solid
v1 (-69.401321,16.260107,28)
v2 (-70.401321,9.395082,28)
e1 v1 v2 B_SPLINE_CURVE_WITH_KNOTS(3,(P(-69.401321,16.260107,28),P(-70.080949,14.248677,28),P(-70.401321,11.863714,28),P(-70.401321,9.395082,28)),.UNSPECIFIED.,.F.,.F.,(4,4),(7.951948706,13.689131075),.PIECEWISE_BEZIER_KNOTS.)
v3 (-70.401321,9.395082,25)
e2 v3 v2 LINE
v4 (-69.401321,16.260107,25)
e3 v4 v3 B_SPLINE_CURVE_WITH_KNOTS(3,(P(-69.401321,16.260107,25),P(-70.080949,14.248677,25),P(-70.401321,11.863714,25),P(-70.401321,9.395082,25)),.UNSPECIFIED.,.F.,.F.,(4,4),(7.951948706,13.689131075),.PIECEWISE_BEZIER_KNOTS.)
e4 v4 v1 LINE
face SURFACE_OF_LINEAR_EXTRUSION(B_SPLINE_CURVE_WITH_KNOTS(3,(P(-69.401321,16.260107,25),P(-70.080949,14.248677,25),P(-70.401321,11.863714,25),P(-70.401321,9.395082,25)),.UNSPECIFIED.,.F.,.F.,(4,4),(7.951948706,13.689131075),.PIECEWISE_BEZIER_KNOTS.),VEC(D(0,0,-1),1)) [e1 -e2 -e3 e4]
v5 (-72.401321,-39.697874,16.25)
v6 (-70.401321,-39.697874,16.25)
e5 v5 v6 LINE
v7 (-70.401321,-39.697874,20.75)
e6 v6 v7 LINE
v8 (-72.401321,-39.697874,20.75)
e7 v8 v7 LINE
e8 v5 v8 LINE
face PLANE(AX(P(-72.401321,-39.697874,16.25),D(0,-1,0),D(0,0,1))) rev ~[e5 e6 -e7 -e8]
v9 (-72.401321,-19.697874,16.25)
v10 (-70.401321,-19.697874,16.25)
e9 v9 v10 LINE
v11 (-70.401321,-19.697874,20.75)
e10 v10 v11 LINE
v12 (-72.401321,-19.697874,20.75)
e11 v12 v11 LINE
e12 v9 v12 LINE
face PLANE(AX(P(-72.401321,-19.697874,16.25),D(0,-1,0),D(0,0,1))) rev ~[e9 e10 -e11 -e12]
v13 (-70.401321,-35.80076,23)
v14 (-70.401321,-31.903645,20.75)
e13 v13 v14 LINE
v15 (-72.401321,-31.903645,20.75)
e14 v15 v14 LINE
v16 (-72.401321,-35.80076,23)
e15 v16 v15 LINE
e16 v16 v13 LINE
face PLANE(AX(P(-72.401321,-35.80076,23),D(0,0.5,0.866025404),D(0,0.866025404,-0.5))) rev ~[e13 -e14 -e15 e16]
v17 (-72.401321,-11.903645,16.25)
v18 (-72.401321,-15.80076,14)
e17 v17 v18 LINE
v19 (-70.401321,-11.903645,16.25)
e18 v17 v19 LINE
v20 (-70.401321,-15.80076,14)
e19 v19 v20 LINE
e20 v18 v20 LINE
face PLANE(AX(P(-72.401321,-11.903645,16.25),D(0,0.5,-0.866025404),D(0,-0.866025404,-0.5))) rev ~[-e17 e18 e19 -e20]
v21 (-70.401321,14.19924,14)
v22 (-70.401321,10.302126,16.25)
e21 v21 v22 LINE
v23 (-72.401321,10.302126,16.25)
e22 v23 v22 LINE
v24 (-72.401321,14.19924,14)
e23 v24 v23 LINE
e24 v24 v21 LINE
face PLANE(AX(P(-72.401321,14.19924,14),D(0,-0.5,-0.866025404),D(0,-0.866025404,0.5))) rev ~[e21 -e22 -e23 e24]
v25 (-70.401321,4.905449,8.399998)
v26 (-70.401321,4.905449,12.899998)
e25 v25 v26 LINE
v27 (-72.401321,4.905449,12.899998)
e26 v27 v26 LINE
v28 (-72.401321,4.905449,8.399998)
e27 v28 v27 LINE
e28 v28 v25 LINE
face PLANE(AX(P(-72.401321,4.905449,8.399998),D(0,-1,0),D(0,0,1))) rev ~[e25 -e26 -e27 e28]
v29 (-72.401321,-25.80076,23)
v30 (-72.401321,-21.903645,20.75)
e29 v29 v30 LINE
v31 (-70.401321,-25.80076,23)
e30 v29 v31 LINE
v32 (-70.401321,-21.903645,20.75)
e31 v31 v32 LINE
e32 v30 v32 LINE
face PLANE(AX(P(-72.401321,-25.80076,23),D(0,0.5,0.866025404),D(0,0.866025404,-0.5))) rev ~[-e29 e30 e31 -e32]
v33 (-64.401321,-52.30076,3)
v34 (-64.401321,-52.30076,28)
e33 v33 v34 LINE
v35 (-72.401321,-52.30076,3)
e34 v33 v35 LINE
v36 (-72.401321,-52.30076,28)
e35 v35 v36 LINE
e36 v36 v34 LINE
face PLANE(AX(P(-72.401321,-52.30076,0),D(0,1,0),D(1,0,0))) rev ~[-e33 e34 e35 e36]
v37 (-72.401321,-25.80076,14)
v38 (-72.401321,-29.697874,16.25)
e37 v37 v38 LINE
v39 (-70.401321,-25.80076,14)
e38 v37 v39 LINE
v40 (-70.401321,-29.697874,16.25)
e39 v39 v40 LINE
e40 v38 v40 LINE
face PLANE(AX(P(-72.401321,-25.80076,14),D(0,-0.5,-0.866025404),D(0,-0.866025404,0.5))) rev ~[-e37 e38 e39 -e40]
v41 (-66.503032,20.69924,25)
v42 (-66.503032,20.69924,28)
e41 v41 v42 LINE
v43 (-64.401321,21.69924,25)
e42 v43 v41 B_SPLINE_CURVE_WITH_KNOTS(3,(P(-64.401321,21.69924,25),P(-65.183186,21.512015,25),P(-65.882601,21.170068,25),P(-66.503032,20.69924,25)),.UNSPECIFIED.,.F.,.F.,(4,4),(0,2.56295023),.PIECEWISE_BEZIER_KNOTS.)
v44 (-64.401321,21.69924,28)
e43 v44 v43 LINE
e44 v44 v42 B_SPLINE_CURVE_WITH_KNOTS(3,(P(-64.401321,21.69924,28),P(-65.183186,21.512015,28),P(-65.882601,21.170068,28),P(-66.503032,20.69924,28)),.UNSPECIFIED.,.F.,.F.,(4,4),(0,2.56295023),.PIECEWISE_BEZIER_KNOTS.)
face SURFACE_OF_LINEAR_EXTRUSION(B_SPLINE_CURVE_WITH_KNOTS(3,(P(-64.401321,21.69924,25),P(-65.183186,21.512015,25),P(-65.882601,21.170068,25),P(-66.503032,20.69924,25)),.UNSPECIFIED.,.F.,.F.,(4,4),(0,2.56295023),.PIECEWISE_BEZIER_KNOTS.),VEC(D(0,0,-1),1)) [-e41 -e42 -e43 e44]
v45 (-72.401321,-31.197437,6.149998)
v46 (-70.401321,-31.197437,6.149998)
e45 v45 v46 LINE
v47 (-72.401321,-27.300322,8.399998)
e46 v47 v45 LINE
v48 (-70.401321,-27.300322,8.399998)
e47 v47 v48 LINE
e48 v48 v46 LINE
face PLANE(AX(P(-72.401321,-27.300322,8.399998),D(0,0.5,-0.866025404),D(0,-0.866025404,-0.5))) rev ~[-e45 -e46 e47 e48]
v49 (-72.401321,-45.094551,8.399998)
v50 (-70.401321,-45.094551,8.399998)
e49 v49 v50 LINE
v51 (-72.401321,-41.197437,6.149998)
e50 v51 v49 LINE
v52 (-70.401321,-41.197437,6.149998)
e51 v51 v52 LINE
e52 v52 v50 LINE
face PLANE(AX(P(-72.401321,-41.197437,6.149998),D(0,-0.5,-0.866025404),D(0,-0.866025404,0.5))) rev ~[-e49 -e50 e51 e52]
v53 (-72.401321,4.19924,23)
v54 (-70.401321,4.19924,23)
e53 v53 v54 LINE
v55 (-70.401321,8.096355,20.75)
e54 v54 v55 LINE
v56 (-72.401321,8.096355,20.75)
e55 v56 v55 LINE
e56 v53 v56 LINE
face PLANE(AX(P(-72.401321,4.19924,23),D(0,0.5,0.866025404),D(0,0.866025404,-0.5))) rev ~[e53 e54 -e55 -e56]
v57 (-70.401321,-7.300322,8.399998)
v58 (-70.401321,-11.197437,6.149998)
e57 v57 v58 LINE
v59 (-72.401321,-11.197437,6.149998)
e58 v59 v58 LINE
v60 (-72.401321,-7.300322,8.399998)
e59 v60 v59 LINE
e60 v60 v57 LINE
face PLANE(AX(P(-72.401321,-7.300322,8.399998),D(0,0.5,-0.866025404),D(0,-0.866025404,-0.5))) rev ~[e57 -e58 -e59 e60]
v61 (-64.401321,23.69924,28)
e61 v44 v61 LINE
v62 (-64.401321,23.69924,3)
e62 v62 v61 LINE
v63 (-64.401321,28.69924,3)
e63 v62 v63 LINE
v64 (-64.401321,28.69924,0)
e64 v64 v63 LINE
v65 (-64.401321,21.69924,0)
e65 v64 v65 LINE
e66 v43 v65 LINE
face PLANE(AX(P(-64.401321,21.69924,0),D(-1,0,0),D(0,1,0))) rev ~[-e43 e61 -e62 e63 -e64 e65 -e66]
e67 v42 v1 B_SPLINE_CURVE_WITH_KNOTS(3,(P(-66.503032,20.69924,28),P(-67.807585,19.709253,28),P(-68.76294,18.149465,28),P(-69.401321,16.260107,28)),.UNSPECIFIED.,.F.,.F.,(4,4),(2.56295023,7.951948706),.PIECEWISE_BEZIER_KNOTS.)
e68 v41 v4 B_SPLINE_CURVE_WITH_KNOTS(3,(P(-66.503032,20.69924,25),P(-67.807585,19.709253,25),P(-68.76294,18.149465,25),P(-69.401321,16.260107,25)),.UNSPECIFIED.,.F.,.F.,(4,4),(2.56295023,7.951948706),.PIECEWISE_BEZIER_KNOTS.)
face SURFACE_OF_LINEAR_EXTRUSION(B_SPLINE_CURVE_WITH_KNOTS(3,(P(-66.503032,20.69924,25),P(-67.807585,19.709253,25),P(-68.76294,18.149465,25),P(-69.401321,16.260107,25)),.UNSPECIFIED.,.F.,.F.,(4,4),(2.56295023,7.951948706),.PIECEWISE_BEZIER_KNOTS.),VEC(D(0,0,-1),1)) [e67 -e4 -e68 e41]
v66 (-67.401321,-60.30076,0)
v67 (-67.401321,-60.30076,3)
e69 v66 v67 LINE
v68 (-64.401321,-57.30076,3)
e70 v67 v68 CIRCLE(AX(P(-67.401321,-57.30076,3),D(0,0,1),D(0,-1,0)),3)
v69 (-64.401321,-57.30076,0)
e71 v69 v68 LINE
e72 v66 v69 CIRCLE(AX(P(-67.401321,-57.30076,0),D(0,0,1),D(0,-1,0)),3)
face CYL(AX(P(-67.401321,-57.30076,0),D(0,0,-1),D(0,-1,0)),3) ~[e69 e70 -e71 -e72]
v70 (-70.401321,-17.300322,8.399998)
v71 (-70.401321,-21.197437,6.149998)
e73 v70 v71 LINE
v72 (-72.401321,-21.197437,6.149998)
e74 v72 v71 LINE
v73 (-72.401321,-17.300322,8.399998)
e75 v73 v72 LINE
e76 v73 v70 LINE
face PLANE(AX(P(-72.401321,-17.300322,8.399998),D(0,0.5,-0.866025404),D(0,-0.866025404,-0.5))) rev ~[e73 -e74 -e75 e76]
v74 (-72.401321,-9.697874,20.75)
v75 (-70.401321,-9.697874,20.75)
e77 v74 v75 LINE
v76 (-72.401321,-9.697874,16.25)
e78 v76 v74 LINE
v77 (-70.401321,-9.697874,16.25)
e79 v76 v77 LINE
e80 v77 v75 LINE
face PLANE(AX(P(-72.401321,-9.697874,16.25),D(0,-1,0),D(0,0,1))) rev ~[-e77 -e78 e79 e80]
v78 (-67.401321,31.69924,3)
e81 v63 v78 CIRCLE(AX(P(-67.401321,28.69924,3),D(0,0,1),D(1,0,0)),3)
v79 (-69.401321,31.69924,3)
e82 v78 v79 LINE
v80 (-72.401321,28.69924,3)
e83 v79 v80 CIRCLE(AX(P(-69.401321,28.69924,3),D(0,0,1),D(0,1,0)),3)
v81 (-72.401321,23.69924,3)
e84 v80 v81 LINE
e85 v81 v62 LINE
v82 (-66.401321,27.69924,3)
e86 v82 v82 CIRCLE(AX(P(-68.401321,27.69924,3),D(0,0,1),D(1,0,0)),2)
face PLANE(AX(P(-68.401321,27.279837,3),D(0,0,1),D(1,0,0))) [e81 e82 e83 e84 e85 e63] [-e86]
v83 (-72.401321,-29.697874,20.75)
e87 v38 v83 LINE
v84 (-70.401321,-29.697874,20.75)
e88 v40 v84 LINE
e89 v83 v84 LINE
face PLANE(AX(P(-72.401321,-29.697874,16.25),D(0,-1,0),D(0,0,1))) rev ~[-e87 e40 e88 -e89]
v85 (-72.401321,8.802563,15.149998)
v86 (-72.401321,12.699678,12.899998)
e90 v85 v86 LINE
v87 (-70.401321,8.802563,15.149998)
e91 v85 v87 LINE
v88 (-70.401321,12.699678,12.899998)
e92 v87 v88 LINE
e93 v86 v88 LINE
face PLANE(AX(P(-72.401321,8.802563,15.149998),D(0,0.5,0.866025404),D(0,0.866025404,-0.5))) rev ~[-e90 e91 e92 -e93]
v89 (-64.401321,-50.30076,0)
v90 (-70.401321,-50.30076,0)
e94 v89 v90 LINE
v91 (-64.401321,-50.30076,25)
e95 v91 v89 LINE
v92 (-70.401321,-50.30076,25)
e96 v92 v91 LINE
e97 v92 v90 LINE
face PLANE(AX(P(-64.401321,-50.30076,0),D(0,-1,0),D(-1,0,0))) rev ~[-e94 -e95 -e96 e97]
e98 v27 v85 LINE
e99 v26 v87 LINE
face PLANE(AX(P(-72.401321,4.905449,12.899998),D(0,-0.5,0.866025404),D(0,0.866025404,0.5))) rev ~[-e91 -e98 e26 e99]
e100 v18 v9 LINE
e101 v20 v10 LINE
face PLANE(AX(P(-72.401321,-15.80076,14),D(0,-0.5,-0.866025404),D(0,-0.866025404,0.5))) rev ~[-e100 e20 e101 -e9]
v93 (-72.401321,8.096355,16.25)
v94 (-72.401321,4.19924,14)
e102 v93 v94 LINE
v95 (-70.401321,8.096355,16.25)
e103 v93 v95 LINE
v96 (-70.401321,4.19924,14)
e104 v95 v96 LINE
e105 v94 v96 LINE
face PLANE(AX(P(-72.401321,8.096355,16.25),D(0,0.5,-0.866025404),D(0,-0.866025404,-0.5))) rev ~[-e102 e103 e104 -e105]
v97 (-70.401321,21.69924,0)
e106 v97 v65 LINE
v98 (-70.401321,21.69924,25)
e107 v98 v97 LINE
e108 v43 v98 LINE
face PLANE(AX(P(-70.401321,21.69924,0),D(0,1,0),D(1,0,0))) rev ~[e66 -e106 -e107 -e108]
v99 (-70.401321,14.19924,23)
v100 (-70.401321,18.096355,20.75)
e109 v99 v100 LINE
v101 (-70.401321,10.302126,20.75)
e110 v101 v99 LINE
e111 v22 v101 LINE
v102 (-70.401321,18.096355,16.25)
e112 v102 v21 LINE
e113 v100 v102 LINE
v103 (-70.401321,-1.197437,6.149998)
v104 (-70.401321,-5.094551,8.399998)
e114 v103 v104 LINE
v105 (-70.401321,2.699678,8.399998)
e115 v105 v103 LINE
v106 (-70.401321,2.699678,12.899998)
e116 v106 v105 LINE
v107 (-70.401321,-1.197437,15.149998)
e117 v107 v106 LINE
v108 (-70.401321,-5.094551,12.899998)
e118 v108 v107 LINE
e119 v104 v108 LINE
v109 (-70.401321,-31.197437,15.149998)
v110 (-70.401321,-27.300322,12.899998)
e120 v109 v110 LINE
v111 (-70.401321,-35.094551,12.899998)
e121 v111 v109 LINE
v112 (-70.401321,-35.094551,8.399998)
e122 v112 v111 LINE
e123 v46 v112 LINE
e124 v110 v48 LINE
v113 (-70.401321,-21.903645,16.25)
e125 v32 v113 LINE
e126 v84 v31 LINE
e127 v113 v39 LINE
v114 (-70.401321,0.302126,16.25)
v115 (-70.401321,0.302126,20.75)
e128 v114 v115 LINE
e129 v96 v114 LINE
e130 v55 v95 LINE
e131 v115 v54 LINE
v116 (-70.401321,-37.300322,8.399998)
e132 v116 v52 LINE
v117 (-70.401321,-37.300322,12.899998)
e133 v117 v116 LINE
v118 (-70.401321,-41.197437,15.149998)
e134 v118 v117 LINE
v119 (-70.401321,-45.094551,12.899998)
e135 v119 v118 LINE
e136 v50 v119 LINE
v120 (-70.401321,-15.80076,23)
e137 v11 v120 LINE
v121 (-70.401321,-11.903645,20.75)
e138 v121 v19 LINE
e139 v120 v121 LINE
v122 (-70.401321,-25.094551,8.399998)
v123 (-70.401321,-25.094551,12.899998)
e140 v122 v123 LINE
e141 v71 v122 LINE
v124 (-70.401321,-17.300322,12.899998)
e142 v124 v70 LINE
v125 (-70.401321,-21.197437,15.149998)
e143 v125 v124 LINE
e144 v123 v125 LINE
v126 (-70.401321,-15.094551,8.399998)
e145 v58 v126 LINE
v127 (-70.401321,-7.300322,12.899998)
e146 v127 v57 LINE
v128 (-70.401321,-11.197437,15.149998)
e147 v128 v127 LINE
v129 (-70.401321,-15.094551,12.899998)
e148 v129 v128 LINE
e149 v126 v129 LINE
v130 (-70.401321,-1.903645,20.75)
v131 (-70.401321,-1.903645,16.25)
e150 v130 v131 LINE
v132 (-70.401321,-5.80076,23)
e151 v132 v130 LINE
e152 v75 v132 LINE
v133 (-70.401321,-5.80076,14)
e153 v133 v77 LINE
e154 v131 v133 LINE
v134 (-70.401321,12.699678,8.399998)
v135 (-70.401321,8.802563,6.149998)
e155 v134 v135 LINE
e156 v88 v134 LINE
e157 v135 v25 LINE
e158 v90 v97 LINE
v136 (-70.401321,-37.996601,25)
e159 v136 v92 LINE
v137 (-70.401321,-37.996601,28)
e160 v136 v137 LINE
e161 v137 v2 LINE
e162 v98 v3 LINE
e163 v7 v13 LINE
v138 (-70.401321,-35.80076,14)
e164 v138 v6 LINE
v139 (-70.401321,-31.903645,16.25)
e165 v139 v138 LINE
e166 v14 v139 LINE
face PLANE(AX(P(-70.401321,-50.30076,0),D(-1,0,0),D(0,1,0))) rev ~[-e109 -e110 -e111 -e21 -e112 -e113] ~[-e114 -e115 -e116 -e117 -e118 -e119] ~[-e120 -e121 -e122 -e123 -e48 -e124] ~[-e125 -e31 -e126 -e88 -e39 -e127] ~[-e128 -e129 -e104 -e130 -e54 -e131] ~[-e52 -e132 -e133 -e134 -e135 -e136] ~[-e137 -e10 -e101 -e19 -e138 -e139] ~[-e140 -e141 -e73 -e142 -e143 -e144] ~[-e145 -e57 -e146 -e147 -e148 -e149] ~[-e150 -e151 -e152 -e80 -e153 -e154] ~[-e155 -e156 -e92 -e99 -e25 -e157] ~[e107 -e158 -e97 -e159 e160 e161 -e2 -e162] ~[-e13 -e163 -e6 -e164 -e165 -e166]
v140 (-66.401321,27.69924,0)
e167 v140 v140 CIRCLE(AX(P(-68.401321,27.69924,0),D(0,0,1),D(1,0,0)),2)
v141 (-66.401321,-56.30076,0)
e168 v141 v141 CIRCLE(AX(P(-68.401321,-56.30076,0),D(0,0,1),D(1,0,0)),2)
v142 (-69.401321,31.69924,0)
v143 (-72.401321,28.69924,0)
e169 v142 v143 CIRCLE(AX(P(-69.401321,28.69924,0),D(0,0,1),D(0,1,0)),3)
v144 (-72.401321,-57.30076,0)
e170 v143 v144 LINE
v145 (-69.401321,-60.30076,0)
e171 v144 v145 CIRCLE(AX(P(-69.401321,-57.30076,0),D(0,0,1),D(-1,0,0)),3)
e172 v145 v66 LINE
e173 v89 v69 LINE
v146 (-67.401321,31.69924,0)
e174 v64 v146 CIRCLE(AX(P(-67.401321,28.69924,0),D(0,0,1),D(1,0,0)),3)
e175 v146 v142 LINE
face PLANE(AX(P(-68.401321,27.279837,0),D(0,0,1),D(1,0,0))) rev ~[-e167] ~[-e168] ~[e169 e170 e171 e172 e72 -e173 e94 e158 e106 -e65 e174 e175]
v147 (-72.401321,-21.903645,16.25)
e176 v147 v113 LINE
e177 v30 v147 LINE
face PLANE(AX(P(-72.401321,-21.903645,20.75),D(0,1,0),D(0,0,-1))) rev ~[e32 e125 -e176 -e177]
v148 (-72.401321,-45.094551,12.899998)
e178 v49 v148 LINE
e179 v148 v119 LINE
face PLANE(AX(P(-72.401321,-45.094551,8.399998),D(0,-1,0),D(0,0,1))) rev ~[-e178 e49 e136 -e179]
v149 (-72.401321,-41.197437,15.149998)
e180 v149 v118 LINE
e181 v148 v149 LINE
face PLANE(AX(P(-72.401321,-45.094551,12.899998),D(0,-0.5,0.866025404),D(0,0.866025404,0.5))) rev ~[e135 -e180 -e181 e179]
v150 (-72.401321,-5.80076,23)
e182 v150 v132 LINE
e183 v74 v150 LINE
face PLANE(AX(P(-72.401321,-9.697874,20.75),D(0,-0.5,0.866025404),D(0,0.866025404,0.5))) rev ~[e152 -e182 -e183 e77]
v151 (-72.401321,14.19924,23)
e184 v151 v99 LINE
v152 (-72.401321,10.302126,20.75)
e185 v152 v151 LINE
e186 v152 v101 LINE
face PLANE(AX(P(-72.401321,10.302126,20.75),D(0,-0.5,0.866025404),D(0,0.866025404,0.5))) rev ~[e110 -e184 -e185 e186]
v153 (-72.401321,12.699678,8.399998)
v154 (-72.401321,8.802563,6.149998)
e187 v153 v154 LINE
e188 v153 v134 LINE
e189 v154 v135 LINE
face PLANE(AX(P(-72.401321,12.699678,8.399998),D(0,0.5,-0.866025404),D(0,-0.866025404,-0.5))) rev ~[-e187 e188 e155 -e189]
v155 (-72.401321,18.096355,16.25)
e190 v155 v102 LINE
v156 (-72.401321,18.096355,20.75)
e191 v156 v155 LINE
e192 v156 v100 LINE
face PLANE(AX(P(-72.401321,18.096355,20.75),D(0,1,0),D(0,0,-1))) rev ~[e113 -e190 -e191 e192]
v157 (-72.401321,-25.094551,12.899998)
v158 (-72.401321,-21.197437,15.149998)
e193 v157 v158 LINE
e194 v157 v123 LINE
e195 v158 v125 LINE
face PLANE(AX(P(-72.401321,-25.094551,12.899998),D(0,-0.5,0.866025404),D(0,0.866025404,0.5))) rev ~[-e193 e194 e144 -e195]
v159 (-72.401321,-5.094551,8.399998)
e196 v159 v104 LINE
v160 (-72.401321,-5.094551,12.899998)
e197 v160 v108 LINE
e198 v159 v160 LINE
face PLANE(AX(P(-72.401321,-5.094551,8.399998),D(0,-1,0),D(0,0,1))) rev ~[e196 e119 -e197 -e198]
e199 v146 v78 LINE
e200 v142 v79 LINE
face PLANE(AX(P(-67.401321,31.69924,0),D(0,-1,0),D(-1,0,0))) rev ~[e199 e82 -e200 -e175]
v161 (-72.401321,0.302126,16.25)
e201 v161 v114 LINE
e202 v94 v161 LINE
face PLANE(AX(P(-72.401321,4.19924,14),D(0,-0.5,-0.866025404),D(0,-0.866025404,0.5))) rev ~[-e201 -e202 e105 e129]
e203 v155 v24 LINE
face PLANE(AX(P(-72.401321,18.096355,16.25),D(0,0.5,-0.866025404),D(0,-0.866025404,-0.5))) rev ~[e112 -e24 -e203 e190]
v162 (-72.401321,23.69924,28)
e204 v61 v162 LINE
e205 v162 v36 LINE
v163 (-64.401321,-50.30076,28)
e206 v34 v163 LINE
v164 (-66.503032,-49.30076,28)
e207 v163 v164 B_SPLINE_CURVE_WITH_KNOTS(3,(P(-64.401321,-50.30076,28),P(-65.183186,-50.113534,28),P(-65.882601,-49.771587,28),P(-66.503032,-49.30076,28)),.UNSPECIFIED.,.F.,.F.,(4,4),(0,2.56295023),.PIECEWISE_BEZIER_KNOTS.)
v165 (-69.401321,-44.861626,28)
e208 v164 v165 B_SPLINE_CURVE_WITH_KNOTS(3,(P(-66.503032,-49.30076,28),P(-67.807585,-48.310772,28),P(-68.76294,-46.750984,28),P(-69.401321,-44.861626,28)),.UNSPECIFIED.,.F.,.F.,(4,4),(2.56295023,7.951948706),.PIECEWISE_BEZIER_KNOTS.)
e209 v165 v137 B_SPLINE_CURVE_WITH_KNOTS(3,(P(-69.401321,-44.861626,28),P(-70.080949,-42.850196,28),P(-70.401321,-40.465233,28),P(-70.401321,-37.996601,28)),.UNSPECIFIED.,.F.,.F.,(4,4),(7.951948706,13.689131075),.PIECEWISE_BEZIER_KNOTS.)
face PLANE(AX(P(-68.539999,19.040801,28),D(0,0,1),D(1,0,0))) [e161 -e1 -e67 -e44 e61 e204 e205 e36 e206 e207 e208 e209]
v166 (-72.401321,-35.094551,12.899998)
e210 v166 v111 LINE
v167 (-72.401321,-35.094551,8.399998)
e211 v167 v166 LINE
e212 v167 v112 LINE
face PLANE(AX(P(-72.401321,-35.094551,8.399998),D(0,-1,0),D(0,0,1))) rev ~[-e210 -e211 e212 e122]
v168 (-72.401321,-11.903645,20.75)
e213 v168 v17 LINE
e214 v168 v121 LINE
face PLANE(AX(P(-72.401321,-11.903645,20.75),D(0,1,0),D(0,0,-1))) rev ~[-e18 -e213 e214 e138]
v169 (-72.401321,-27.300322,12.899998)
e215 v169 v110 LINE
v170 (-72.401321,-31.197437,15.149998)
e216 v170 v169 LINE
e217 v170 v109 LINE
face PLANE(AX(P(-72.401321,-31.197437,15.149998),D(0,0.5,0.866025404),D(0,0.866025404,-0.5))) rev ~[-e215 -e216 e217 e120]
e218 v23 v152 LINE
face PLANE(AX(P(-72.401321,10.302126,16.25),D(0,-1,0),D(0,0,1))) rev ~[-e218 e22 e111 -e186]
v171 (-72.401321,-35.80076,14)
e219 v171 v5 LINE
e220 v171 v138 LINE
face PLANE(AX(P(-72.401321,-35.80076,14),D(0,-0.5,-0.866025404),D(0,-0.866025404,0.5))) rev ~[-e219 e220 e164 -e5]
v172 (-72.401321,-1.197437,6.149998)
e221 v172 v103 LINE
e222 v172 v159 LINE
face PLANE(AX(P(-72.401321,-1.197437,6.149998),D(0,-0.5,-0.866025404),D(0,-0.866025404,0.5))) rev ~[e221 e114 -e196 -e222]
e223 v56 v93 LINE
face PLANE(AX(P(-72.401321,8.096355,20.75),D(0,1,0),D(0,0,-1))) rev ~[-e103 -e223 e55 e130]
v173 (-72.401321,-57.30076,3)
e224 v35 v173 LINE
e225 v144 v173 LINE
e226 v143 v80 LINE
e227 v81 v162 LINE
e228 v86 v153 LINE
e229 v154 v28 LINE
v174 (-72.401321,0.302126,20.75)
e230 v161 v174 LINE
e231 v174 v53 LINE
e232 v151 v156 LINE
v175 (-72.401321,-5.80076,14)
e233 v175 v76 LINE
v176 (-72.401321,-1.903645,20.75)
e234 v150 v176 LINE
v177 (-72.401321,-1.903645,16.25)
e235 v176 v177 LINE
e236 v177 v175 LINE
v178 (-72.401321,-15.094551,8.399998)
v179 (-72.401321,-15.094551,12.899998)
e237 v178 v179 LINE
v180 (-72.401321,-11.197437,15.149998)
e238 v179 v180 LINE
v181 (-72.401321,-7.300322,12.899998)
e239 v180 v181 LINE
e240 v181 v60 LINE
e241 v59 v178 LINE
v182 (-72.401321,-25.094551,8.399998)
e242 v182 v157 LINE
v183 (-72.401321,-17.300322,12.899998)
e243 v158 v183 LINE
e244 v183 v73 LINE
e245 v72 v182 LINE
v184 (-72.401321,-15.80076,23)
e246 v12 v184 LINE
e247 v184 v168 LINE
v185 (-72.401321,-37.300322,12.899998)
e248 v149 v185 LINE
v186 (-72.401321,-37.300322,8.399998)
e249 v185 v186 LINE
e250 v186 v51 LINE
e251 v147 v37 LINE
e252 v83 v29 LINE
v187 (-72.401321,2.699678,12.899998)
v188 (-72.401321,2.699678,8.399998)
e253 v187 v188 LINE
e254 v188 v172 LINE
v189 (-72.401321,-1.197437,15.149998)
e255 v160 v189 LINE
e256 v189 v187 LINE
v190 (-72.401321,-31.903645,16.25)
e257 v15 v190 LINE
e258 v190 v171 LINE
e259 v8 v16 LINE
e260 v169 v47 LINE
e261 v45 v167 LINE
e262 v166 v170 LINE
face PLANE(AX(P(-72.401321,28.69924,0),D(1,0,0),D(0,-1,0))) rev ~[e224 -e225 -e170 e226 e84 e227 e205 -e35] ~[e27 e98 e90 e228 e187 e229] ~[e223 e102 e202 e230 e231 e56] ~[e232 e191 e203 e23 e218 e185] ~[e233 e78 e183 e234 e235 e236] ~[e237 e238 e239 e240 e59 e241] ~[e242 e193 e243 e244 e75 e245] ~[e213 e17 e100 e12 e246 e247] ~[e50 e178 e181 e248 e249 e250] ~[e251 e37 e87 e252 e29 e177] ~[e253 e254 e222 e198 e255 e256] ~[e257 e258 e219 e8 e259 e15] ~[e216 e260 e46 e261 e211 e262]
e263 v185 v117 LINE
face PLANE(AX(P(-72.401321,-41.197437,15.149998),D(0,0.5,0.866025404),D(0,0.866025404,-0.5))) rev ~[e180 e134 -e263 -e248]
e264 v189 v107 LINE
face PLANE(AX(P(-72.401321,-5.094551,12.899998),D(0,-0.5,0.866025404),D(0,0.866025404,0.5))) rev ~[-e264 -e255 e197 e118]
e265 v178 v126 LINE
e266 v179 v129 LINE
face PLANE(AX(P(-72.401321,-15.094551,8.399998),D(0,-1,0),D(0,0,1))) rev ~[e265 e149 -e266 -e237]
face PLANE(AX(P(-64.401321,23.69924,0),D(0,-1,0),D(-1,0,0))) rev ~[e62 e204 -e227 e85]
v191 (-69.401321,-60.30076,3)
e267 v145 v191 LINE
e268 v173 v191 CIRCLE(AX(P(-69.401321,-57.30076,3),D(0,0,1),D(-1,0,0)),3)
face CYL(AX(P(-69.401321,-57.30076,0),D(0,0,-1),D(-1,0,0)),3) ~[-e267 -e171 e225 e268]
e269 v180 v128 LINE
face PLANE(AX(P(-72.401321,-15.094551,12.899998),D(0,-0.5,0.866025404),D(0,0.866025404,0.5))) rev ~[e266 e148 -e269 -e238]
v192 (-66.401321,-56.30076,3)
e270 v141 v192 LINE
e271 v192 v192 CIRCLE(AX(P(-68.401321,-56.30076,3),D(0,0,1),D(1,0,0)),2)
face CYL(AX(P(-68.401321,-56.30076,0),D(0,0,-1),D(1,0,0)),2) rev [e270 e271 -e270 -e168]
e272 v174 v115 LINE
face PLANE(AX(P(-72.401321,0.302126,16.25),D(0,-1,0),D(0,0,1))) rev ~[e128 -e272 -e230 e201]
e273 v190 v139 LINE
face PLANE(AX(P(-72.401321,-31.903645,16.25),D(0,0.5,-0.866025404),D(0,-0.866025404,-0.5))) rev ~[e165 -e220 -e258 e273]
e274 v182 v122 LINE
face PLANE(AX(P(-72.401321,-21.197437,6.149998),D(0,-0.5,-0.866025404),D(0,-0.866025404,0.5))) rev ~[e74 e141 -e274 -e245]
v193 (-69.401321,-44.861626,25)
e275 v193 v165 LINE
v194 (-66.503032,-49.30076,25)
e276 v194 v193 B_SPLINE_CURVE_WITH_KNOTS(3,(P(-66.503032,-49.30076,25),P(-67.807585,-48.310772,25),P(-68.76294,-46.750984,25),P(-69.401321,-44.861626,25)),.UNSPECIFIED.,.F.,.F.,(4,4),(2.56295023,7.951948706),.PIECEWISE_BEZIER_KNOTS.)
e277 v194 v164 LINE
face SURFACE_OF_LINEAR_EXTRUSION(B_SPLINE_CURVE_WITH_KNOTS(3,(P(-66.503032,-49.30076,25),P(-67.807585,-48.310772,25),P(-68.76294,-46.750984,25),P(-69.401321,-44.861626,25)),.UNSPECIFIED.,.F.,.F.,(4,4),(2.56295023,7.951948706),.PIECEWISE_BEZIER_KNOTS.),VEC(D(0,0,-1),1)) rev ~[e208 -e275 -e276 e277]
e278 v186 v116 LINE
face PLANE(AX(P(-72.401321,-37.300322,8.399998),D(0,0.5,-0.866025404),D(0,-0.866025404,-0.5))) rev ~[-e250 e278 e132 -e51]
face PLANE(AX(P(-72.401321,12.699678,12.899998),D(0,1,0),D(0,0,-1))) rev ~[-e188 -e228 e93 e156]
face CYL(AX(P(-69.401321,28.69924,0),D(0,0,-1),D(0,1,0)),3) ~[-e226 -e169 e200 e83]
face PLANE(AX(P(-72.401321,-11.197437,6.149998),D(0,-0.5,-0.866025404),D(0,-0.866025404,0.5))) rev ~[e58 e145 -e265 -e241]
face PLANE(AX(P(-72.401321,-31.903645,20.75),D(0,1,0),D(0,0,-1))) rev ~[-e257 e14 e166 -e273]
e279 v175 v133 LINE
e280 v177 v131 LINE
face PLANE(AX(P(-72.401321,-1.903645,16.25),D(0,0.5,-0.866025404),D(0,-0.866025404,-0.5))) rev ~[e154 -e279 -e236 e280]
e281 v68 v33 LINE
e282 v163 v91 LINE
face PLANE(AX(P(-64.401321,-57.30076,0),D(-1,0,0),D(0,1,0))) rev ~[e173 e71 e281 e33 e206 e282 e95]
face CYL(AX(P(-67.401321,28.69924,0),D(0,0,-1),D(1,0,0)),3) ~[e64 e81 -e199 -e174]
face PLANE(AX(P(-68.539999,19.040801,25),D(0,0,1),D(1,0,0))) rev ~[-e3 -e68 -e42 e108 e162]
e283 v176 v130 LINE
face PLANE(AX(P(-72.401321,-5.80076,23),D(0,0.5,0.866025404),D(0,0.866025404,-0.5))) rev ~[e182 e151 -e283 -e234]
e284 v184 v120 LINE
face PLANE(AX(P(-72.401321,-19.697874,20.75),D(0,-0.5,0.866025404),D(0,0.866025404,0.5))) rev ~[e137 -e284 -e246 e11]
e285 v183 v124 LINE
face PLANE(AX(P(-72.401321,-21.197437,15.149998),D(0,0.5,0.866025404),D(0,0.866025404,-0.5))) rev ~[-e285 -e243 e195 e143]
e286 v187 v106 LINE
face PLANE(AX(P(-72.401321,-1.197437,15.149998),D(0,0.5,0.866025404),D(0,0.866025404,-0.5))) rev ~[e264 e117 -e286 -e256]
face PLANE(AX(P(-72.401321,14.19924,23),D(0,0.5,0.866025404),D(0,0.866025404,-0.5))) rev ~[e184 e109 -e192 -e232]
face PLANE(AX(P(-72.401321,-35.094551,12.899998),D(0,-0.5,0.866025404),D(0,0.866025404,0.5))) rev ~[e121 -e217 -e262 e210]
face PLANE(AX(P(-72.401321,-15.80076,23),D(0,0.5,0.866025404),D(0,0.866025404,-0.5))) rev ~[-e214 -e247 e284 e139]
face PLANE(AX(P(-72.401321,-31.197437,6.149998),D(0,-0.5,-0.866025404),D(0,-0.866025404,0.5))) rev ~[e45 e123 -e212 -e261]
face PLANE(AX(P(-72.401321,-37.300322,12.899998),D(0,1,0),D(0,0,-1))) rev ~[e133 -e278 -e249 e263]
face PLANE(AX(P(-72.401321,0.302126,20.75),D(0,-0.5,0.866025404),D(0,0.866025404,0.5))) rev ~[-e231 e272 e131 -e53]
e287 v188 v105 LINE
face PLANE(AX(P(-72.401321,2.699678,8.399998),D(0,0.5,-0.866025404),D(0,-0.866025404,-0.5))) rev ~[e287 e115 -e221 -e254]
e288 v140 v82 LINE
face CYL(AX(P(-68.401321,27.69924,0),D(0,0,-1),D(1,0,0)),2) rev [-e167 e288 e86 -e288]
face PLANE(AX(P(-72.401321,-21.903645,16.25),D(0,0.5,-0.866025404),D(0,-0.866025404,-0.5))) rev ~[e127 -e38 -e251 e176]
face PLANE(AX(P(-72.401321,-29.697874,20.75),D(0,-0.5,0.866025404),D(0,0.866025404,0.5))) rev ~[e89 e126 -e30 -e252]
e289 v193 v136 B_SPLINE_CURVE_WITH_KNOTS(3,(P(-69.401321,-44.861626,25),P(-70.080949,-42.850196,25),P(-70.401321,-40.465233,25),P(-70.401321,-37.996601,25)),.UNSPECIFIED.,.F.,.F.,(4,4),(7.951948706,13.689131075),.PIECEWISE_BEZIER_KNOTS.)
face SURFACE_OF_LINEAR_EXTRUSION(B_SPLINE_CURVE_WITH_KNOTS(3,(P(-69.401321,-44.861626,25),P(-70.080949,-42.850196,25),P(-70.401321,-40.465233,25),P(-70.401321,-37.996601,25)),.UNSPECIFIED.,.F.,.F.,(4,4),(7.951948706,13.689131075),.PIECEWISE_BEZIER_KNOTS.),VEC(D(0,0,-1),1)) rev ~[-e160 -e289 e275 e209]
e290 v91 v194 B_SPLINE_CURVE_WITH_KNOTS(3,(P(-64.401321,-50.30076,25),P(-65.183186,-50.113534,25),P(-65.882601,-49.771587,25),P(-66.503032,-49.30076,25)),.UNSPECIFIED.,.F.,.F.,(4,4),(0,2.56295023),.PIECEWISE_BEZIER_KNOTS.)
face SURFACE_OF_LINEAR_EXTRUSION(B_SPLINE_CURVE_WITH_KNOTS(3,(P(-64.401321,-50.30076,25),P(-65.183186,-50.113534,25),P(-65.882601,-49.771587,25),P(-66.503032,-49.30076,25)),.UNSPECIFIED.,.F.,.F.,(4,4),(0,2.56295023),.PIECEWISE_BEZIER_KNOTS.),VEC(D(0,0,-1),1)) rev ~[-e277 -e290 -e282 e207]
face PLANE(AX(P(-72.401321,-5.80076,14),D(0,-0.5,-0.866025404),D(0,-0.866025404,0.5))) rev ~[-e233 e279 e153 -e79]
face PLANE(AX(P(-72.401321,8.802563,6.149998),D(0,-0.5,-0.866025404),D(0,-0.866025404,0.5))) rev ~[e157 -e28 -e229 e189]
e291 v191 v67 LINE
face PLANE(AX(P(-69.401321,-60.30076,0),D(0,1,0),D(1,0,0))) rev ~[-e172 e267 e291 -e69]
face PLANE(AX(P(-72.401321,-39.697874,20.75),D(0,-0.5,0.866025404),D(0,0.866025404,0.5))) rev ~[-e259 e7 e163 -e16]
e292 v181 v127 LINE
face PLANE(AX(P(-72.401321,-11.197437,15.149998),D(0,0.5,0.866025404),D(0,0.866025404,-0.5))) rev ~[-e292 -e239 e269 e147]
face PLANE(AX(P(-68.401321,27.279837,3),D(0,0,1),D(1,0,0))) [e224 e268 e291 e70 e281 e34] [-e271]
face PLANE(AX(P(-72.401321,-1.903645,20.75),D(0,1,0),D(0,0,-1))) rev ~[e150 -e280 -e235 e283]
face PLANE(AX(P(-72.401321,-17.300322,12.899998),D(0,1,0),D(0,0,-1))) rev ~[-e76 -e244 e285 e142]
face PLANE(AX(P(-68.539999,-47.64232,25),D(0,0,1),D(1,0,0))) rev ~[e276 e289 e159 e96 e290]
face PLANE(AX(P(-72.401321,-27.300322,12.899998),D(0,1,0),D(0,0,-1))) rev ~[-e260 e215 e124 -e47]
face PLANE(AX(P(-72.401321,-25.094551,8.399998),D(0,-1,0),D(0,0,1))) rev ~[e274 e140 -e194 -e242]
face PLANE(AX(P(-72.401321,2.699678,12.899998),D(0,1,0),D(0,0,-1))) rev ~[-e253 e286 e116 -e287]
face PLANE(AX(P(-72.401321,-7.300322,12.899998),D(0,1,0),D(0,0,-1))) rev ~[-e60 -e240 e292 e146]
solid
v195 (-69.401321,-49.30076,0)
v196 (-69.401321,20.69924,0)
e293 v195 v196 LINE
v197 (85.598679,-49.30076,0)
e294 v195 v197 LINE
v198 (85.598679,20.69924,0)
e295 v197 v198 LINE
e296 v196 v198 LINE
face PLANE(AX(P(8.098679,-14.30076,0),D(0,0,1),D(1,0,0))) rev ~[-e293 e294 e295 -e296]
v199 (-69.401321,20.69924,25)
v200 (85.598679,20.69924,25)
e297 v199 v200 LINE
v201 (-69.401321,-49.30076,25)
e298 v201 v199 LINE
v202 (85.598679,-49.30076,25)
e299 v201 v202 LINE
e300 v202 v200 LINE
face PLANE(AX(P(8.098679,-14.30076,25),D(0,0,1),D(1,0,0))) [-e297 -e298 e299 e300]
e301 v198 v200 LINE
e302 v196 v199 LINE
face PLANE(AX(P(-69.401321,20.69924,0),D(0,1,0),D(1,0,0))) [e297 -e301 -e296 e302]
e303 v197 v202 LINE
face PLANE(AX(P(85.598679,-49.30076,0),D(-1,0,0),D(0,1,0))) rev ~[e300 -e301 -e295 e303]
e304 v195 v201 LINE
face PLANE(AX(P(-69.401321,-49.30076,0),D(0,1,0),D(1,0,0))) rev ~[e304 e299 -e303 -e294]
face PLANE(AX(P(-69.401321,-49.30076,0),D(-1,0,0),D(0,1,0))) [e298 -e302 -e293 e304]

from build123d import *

# Parameters (mm, degrees)
F0_W     = 155
F0_H     = 70
F1_DEPTH = 25
F2_R     = 2
F3_DEPTH = 3
F4_DEPTH = 28
F5_START = 25
F5_DEPTH = 3
F7_DEPTH = 25


# Not quite as in the source:
# - a feature names something its author has since deleted; it is built from what else it names


with BuildPart() as f1:
    # F0 (on Top) → F1 (new body)
    with BuildSketch(Plane.XY):
        with Locations((8.0986786634, -14.300759537)):
            Rectangle(F0_W, F0_H)
    extrude(amount=F1_DEPTH)


with BuildPart() as f3:
    # F2 (on Top) → F3 (new body)
    with BuildSketch(Plane.XY):
        with BuildLine():
            Line((-72.4013213366, 23.699240463), (-64.4013213366, 23.699240463))
            Line((-64.4013213366, 23.699240463), (-64.4013213366, 28.699240463))
            ThreePointArc((-64.4013213366, 28.699240463), (-65.2800009931, 30.8205608065), (-67.4013213366, 31.699240463))
            Line((-67.4013213366, 31.699240463), (-69.4013213366, 31.699240463))
            ThreePointArc((-69.4013213366, 31.699240463), (-71.5226416802, 30.8205608065), (-72.4013213366, 28.699240463))
            Line((-72.4013213366, 28.699240463), (-72.4013213366, 23.699240463))
        make_face()
        with Locations((-68.4013213366, 27.699240463)):
            Circle(F2_R, mode=Mode.SUBTRACT)
        Polygon((-70.4013213366, -14.300759537), (-70.4013213366, 9.3950822393), (-70.4013213366, 21.699240463), (-64.4013213366, 21.699240463), (-64.4013213366, 23.699240463), (-72.4013213366, 23.699240463), (-72.4013213366, -14.300759537), align=None)
        Polygon((-70.4013213366, -50.300759537), (-70.4013213366, -37.9966013134), (-70.4013213366, -14.300759537), (-72.4013213366, -14.300759537), (-72.4013213366, -52.300759537), (-64.4013213366, -52.300759537), (-64.4013213366, -50.300759537), align=None)
        with BuildLine():
            Line((-64.4013213366, -57.300759537), (-64.4013213366, -52.300759537))
            Line((-64.4013213366, -52.300759537), (-72.4013213366, -52.300759537))
            Line((-72.4013213366, -52.300759537), (-72.4013213366, -57.300759537))
            ThreePointArc((-72.4013213366, -57.300759537), (-71.5226416802, -59.4220798806), (-69.4013213366, -60.300759537))
            Line((-69.4013213366, -60.300759537), (-67.4013213366, -60.300759537))
            ThreePointArc((-67.4013213366, -60.300759537), (-65.2800009931, -59.4220798806), (-64.4013213366, -57.300759537))
        make_face()
        with Locations((-68.4013213366, -56.300759537)):
            Circle(F2_R, mode=Mode.SUBTRACT)
    extrude(amount=F3_DEPTH)

    # F2 (on Top) → F4 (join, through all)
    with BuildSketch(Plane.XY):
        Polygon((-70.4013213366, -50.300759537), (-70.4013213366, -37.9966013134), (-70.4013213366, -14.300759537), (-72.4013213366, -14.300759537), (-72.4013213366, -52.300759537), (-64.4013213366, -52.300759537), (-64.4013213366, -50.300759537), align=None)
        Polygon((-70.4013213366, -14.300759537), (-70.4013213366, 9.3950822393), (-70.4013213366, 21.699240463), (-64.4013213366, 21.699240463), (-64.4013213366, 23.699240463), (-72.4013213366, 23.699240463), (-72.4013213366, -14.300759537), align=None)
    extrude(amount=F4_DEPTH)

    # F2 (on Top) → F5 (join)
    with BuildSketch(Plane.XY.offset(F5_START)):
        with BuildLine():
            Line((-66.5030320211, 20.699240463), (-69.4013213366, 20.699240463))
            Line((-69.4013213366, 20.699240463), (-69.4013213366, 16.260107167))
            add(Edge.make_bspline(
                [(-66.5030320211, 20.699240463), (-67.8075846929, 19.7092528514), (-68.7629395105, 18.1494653893), (-69.4013213366, 16.260107167)],
                knots=[2.5629502301, 2.5629502301, 2.5629502301, 2.5629502301, 7.9519487063, 7.9519487063, 7.9519487063, 7.9519487063], degree=3))
        make_face()
        with BuildLine():
            Line((-69.4013213366, 16.260107167), (-69.4013213366, 20.699240463))
            Line((-69.4013213366, 20.699240463), (-66.5030320211, 20.699240463))
            add(Edge.make_bspline(
                [(-64.4013213366, 21.699240463), (-65.1831859383, 21.5120152683), (-65.8826006765, 21.1700680181), (-66.5030320211, 20.699240463)],
                knots=[0, 0, 0, 0, 2.5629502301, 2.5629502301, 2.5629502301, 2.5629502301], degree=3))
            Line((-64.4013213366, 21.699240463), (-70.4013213366, 21.699240463))
            Line((-70.4013213366, 21.699240463), (-70.4013213366, 9.3950822393))
            add(Edge.make_bspline(
                [(-69.4013213366, 16.260107167), (-70.0809490956, 14.2486772642), (-70.4013213366, 11.8637135989), (-70.4013213366, 9.3950822393)],
                knots=[7.9519487063, 7.9519487063, 7.9519487063, 7.9519487063, 13.6891310752, 13.6891310752, 13.6891310752, 13.6891310752], degree=3))
        make_face()
        with BuildLine():
            add(Edge.make_bspline(
                [(-66.5030320211, -49.300759537), (-67.8075846929, -48.3107719254), (-68.7629395105, -46.7509844633), (-69.4013213366, -44.861626241)],
                knots=[2.5629502301, 2.5629502301, 2.5629502301, 2.5629502301, 7.9519487063, 7.9519487063, 7.9519487063, 7.9519487063], degree=3))
            Line((-69.4013213366, -44.861626241), (-69.4013213366, -49.300759537))
            Line((-69.4013213366, -49.300759537), (-66.5030320211, -49.300759537))
        make_face()
        with BuildLine():
            Line((-69.4013213366, -49.300759537), (-69.4013213366, -44.861626241))
            add(Edge.make_bspline(
                [(-69.4013213366, -44.861626241), (-70.0809490956, -42.8501963382), (-70.4013213366, -40.4652326729), (-70.4013213366, -37.9966013134)],
                knots=[7.9519487063, 7.9519487063, 7.9519487063, 7.9519487063, 13.6891310752, 13.6891310752, 13.6891310752, 13.6891310752], degree=3))
            Line((-70.4013213366, -37.9966013134), (-70.4013213366, -50.300759537))
            Line((-70.4013213366, -50.300759537), (-64.4013213366, -50.300759537))
            add(Edge.make_bspline(
                [(-64.4013213366, -50.300759537), (-65.1831859383, -50.1135343424), (-65.8826006765, -49.7715870921), (-66.5030320211, -49.300759537)],
                knots=[0, 0, 0, 0, 2.5629502301, 2.5629502301, 2.5629502301, 2.5629502301], degree=3))
            Line((-66.5030320211, -49.300759537), (-69.4013213366, -49.300759537))
        make_face()
    extrude(amount=F5_DEPTH)

    # F6 (on face) → F7 (cut)
    with BuildSketch(Plane(origin=(-72.4013213366, 0, 0), x_dir=(0, -1, 0), z_dir=(-1, 0, 0))):
        Polygon((-18.09635478, 16.25), (-14.199240463, 14), (-10.302126146, 16.25), (-10.302126146, 20.75), (-14.199240463, 23), (-18.09635478, 20.75), align=None)
        Polygon((-4.199240463, 23), (-8.09635478, 20.75), (-8.09635478, 16.25), (-4.199240463, 14), (-0.302126146, 16.25), (-0.302126146, 20.75), align=None)
        Polygon((5.800759537, 23), (1.90364522, 20.75), (1.90364522, 16.25), (5.800759537, 14), (9.697873854, 16.25), (9.697873854, 20.75), align=None)
        Polygon((15.800759537, 23), (11.90364522, 20.75), (11.90364522, 16.25), (15.800759537, 14), (19.697873854, 16.25), (19.697873854, 20.75), align=None)
        Polygon((25.800759537, 23), (21.90364522, 20.75), (21.90364522, 16.25), (25.800759537, 14), (29.697873854, 16.25), (29.697873854, 20.75), align=None)
        Polygon((35.800759537, 23), (31.90364522, 20.75), (31.90364522, 16.25), (35.800759537, 14), (39.697873854, 16.25), (39.697873854, 20.75), align=None)
        Polygon((37.3003223389, 8.3999978378), (41.197436656, 6.1499978378), (45.094550973, 8.3999978378), (45.094550973, 12.8999978378), (41.197436656, 15.1499978378), (37.3003223389, 12.8999978378), align=None)
        Polygon((27.3003223389, 8.3999978378), (31.197436656, 6.1499978378), (35.094550973, 8.3999978378), (35.094550973, 12.8999978378), (31.197436656, 15.1499978378), (27.3003223389, 12.8999978378), align=None)
        Polygon((17.3003223389, 8.3999978378), (21.197436656, 6.1499978378), (25.094550973, 8.3999978378), (25.094550973, 12.8999978378), (21.197436656, 15.1499978378), (17.3003223389, 12.8999978378), align=None)
        Polygon((7.3003223389, 8.3999978378), (11.197436656, 6.1499978378), (15.094550973, 8.3999978378), (15.094550973, 12.8999978378), (11.197436656, 15.1499978378), (7.3003223389, 12.8999978378), align=None)
        Polygon((-2.6996776611, 8.3999978378), (1.197436656, 6.1499978378), (5.094550973, 8.3999978378), (5.094550973, 12.8999978378), (1.197436656, 15.1499978378), (-2.6996776611, 12.8999978378), align=None)
        Polygon((-8.802563344, 15.1499978378), (-12.6996776611, 12.8999978378), (-12.6996776611, 8.3999978378), (-8.802563344, 6.1499978378), (-4.905449027, 8.3999978378), (-4.905449027, 12.8999978378), align=None)
    extrude(amount=-F7_DEPTH, mode=Mode.SUBTRACT)


solid = Compound([f1.part, f3.part])
